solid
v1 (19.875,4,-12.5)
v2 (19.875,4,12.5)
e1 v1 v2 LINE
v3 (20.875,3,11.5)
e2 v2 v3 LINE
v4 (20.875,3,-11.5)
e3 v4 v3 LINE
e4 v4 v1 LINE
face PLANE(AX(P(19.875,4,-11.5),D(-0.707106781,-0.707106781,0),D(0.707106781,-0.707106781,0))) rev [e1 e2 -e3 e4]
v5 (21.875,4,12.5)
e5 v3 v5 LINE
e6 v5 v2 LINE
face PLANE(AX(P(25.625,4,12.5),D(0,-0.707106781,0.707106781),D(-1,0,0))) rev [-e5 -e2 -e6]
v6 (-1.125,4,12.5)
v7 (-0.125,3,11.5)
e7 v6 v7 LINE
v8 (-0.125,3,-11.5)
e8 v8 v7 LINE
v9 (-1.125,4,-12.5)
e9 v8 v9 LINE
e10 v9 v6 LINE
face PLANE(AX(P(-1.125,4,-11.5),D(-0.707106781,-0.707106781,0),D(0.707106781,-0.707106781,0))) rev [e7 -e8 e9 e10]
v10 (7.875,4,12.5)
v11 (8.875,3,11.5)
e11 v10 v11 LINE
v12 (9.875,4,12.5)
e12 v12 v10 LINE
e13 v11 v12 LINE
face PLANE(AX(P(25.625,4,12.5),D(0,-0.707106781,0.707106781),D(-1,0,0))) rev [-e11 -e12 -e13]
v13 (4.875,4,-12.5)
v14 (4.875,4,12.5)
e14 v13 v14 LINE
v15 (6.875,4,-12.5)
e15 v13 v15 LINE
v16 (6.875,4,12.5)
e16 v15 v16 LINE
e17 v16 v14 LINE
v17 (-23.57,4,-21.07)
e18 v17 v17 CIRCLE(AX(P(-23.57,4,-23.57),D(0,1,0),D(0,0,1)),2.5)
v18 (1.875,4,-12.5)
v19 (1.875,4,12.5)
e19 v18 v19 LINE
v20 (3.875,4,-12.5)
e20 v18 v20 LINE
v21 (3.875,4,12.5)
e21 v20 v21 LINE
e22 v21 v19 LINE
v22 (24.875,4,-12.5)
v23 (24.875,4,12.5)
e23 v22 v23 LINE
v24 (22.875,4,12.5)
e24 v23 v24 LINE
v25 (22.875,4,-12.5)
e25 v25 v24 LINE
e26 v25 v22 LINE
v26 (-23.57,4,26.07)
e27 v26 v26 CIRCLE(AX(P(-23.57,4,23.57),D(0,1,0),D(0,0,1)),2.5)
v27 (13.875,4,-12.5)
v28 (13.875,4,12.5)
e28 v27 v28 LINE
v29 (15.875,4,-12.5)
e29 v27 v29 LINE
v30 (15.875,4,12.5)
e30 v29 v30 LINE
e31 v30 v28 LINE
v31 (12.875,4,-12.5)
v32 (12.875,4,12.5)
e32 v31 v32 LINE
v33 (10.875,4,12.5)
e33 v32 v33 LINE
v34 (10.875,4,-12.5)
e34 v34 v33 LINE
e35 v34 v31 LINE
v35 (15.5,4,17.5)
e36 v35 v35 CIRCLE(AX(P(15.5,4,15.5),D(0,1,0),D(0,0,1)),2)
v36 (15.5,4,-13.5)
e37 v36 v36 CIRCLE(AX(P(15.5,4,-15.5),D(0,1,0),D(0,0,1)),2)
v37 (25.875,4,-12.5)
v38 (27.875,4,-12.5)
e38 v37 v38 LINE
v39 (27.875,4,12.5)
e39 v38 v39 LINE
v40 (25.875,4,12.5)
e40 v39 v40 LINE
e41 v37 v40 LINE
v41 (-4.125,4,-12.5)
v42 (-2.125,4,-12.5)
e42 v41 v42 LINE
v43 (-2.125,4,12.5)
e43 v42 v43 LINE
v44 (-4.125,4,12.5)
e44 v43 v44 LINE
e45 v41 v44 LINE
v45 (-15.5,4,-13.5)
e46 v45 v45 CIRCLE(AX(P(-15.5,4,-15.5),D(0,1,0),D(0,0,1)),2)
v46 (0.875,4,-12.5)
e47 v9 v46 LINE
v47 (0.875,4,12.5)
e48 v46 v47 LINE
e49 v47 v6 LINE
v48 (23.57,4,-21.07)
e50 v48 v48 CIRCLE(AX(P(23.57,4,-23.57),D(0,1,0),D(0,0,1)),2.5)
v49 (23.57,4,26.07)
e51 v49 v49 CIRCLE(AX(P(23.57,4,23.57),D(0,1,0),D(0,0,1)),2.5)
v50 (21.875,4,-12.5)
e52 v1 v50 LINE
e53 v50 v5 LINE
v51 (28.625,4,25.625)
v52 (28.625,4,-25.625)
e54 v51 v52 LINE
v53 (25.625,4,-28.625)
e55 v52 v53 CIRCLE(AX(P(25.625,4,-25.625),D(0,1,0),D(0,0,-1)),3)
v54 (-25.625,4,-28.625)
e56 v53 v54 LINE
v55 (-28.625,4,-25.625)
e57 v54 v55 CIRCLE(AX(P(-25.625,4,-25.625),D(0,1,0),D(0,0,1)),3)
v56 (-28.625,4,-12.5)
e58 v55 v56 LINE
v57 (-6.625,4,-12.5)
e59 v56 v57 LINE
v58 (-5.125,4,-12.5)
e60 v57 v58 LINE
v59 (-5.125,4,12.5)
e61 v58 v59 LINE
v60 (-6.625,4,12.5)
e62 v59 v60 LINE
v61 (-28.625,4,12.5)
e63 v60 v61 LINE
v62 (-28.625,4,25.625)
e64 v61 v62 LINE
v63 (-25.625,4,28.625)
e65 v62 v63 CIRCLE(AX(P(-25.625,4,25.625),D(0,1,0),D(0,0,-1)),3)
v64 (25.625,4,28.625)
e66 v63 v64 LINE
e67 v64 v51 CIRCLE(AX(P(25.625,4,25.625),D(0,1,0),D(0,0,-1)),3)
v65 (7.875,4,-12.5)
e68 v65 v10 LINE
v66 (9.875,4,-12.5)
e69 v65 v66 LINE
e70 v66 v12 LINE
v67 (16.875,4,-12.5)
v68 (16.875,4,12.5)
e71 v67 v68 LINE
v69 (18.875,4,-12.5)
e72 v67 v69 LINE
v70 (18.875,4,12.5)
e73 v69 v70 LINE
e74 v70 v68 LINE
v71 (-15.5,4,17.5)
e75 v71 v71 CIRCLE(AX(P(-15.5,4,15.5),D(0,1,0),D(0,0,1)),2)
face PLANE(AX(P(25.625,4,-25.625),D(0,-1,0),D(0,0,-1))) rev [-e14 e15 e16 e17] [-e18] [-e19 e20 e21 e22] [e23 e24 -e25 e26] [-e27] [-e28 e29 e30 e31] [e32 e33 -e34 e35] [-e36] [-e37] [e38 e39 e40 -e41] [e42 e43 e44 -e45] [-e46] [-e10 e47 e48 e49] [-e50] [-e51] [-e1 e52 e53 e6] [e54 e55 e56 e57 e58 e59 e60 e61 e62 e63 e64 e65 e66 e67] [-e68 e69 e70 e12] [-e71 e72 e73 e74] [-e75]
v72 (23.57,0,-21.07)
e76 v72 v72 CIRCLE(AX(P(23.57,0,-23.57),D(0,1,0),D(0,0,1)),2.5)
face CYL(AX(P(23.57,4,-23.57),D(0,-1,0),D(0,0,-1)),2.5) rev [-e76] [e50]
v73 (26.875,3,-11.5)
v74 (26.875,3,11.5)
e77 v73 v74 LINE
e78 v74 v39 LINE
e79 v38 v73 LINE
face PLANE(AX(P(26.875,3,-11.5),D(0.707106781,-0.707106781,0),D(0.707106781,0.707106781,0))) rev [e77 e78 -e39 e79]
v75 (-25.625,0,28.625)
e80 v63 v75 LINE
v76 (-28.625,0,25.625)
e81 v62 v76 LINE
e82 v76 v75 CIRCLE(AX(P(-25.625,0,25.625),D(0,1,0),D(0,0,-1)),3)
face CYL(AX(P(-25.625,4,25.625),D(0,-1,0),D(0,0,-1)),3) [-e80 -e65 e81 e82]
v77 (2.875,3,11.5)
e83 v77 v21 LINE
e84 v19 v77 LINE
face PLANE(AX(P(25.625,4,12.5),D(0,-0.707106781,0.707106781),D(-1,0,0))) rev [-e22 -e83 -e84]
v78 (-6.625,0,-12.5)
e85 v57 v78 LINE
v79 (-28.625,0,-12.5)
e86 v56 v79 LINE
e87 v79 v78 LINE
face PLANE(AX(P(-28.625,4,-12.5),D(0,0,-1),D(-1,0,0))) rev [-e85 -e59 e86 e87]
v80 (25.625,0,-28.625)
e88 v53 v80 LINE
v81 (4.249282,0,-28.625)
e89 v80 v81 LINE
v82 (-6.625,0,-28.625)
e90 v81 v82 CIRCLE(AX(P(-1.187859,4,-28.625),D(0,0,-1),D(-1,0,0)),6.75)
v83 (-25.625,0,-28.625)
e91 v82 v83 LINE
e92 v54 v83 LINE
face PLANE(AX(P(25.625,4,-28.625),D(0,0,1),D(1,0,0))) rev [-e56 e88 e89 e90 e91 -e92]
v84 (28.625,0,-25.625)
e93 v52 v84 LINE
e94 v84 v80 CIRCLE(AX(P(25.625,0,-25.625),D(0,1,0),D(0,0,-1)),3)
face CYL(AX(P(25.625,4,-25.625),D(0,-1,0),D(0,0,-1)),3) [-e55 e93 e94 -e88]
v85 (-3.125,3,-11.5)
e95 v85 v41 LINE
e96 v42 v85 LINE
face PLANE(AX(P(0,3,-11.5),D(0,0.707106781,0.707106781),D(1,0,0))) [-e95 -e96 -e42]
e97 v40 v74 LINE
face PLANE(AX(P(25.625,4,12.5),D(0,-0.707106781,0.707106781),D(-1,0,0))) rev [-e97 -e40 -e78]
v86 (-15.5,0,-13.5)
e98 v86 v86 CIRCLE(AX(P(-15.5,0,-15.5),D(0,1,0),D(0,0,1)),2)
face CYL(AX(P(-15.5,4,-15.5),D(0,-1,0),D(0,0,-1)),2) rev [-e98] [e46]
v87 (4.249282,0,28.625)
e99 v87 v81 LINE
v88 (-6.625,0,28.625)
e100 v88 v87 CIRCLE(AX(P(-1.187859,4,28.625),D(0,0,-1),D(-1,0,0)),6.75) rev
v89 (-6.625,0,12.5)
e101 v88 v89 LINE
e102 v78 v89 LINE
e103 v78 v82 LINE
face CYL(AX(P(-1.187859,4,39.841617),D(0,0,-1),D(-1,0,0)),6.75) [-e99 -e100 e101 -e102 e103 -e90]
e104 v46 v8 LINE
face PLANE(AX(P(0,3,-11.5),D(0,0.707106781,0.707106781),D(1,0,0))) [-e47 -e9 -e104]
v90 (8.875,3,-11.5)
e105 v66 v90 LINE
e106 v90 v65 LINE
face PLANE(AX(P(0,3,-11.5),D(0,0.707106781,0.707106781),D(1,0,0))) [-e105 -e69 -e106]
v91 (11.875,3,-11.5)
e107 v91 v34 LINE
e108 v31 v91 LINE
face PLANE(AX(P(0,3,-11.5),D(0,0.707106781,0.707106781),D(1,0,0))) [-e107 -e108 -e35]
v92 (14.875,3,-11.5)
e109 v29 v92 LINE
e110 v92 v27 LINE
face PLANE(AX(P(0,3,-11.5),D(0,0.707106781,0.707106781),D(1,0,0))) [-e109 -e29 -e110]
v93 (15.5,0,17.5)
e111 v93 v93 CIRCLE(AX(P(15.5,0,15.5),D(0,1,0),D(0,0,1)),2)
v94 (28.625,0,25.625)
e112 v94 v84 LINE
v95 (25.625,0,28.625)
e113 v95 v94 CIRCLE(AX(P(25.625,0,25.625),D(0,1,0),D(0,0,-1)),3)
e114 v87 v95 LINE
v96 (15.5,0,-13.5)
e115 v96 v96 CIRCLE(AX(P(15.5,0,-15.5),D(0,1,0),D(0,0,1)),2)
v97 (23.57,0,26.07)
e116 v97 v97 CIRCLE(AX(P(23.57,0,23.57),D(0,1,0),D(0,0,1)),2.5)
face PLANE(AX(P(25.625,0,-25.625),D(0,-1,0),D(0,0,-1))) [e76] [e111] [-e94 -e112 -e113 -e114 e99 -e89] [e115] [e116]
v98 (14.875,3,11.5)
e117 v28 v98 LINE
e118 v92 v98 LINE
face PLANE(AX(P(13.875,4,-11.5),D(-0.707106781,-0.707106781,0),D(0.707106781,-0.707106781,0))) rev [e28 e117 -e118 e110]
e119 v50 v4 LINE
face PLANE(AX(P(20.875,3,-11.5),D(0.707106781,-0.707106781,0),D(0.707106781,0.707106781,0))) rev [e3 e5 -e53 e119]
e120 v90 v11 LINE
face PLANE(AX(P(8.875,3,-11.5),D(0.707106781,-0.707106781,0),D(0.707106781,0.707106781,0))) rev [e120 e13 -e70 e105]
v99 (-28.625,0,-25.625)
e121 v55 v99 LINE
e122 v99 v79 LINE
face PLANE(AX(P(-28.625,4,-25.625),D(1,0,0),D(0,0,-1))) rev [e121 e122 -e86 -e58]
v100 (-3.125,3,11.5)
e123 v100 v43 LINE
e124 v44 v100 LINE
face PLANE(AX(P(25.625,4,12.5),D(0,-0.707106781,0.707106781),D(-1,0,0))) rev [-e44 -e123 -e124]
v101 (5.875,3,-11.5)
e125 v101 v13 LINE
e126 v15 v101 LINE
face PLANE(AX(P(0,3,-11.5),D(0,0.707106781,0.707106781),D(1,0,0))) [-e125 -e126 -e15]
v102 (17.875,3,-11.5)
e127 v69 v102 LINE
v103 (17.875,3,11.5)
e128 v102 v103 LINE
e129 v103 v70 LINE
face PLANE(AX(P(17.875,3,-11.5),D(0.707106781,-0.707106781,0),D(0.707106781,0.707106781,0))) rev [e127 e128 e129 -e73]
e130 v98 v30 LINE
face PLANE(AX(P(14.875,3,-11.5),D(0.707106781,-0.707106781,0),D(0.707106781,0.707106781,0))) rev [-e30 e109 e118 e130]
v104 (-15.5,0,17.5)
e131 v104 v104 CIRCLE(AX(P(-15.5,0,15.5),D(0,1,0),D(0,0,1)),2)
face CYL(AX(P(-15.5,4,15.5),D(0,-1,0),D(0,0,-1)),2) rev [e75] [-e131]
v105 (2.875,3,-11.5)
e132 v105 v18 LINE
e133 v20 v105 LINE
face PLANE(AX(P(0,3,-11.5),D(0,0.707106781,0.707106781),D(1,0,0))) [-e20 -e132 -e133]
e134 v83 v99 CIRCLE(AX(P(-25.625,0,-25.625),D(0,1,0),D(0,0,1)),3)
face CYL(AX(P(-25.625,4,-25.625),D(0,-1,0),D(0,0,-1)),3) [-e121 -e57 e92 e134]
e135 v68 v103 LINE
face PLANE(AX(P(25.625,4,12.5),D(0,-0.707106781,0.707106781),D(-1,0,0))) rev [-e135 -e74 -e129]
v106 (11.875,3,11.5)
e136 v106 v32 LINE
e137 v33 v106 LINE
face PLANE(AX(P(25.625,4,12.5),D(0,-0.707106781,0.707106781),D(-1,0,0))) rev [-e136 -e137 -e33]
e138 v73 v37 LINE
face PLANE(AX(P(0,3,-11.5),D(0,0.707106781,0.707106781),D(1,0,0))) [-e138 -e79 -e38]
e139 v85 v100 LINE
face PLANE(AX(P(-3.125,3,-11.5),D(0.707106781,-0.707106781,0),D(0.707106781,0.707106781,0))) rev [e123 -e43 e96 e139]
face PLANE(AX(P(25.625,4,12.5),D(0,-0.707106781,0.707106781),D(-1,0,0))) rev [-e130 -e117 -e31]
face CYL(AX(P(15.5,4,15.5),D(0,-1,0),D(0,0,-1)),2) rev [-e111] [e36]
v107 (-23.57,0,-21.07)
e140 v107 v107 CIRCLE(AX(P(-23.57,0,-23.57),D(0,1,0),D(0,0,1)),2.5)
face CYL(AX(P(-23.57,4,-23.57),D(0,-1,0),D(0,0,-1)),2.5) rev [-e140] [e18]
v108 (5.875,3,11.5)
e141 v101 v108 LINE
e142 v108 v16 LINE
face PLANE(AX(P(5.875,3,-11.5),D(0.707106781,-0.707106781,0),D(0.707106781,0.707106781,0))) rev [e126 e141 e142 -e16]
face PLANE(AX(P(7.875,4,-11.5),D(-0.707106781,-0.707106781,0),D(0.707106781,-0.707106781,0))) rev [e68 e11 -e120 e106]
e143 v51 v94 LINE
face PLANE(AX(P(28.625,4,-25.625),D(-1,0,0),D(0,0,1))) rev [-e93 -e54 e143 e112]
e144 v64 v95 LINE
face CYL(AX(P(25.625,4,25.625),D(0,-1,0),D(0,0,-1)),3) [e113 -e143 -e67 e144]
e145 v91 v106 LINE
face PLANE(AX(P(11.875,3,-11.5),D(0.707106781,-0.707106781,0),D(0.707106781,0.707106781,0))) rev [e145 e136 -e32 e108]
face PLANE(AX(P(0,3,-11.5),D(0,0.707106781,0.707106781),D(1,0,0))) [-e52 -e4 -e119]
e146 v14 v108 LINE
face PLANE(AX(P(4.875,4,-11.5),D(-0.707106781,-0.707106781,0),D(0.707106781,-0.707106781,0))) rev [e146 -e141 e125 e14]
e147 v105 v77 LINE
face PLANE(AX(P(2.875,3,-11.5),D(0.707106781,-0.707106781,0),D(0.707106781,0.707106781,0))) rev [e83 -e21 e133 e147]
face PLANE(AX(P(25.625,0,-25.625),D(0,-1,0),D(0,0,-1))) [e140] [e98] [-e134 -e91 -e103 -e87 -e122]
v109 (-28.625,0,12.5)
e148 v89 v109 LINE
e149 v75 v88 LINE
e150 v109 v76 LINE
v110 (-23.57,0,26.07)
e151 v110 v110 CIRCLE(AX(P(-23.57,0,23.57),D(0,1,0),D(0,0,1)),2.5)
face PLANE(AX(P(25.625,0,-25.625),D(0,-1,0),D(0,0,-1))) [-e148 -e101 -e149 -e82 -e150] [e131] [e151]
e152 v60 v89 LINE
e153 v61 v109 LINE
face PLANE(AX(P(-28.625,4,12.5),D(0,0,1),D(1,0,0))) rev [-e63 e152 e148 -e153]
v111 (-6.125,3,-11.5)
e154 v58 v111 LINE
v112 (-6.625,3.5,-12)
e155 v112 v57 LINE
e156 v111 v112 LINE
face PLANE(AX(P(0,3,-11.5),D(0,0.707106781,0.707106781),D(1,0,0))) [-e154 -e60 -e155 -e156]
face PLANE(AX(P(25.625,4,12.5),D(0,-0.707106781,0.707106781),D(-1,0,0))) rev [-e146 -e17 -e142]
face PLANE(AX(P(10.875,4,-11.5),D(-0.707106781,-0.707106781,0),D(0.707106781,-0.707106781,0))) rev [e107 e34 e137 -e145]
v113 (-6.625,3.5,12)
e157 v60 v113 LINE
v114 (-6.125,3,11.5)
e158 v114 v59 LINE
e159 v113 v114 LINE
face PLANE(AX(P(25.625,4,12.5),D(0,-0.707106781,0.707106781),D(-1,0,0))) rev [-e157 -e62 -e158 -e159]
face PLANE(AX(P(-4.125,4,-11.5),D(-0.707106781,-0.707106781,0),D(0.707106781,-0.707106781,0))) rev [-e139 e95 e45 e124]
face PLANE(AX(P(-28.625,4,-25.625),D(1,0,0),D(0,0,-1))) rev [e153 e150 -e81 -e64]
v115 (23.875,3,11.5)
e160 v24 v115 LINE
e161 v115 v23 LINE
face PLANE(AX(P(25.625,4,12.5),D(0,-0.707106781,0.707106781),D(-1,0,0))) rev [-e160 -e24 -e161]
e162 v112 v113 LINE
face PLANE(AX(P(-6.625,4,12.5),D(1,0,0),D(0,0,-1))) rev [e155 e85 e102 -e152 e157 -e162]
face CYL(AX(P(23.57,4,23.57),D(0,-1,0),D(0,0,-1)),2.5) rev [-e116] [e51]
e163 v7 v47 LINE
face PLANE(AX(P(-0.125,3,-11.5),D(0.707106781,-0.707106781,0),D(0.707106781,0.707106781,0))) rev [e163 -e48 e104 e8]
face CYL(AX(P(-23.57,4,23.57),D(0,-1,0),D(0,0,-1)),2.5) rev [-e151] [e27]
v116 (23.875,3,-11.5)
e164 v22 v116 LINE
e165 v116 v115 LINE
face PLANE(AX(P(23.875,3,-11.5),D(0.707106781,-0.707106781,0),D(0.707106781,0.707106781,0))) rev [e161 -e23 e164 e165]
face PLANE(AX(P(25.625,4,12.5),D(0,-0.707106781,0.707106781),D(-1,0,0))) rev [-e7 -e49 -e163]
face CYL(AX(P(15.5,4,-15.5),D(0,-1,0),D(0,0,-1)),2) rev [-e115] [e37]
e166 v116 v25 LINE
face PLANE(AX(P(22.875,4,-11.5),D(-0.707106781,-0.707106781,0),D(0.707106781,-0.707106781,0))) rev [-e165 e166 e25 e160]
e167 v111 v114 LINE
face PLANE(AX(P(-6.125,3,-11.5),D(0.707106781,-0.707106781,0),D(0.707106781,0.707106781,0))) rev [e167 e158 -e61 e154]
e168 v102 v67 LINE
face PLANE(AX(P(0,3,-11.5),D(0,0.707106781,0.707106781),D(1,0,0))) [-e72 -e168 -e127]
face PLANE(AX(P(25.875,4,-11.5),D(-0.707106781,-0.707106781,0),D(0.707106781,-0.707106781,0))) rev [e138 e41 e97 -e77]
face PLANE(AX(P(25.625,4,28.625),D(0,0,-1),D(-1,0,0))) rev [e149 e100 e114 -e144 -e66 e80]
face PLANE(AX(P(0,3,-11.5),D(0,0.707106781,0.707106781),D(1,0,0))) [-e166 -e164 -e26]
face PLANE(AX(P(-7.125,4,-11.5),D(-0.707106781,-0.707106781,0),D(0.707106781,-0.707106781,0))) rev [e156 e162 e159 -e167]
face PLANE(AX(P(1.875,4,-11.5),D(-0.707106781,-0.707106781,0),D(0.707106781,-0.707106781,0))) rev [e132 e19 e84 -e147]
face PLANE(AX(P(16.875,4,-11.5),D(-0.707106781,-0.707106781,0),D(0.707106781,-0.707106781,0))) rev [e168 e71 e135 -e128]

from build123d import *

# Parameters (mm, degrees)
SKETCH1_R              = 2
SKETCH1_R_2            = 2.5
BOSS_EXTRUDE1_DEPTH    = 4
CUT_EXTRUDE2_DEPTH     = 23
CHAMFER2_SIZE          = 1
CUT_EXTRUDE3_START     = -4
CUT_EXTRUDE3_OUTLINE_W = 22
CUT_EXTRUDE3_OUTLINE_H = 25
CUT_EXTRUDE3_DEPTH     = 4
BOSS_EXTRUDE2_REACH    = 66.132


# Read off the part's stored shape, not the designer's step: Cut-Extrude3
with BuildPart() as part:
    # Sketch1 → Boss-Extrude1 (new body)
    with BuildSketch(Plane(origin=(0, 0, 0), x_dir=(1, 0, 0), z_dir=(0, 1, 0))):
        with BuildLine():
            Line((25.625, 28.625), (-25.625, 28.625))
            ThreePointArc((-25.625, 28.625), (-27.746320344, 27.746320344), (-28.625, 25.625))
            Line((-28.625, 25.625), (-28.625, -25.625))
            ThreePointArc((-28.625, -25.625), (-27.746320344, -27.746320344), (-25.625, -28.625))
            Line((-25.625, -28.625), (25.625, -28.625))
            ThreePointArc((25.625, -28.625), (27.746320344, -27.746320344), (28.625, -25.625))
            Line((28.625, -25.625), (28.625, 25.625))
            ThreePointArc((28.625, 25.625), (27.746320344, 27.746320344), (25.625, 28.625))
        make_face()
        with Locations(Location((-15.5, 15.5, 0), (0, 0, 270))):
            Circle(SKETCH1_R, mode=Mode.SUBTRACT)
        with Locations(Location((-23.57, 23.57, 0), (0, 0, 270))):
            Circle(SKETCH1_R_2, mode=Mode.SUBTRACT)
        with Locations(Location((23.57, 23.57, 0), (0, 0, 270))):
            Circle(SKETCH1_R_2, mode=Mode.SUBTRACT)
        with Locations(Location((15.5, 15.5, 0), (0, 0, 270))):
            Circle(SKETCH1_R, mode=Mode.SUBTRACT)
        with Locations(Location((15.5, -15.5, 0), (0, 0, 270))):
            Circle(SKETCH1_R, mode=Mode.SUBTRACT)
        with Locations(Location((-15.5, -15.5, 0), (0, 0, 270))):
            Circle(SKETCH1_R, mode=Mode.SUBTRACT)
        with Locations(Location((-23.57, -23.57, 0), (0, 0, 270))):
            Circle(SKETCH1_R_2, mode=Mode.SUBTRACT)
        with Locations(Location((23.57, -23.57, 0), (0, 0, 270))):
            Circle(SKETCH1_R_2, mode=Mode.SUBTRACT)
    extrude(amount=BOSS_EXTRUDE1_DEPTH)

    # Sketch3 → Cut-Extrude2 (cut)
    with BuildSketch(Plane.XY.offset(11.5)):
        Polygon((-28.125, 4), (-27.125, 3), (-26.125, 4), align=None)
        Polygon((-25.125, 4), (-24.125, 3), (-23.125, 4), align=None)
        Polygon((-22.125, 4), (-21.125, 3), (-20.125, 4), align=None)
        Polygon((-19.125, 4), (-18.125, 3), (-17.125, 4), align=None)
        Polygon((-16.125, 4), (-15.125, 3), (-14.125, 4), align=None)
        Polygon((-13.125, 4), (-12.125, 3), (-11.125, 4), align=None)
        Polygon((-10.125, 4), (-9.125, 3), (-8.125, 4), align=None)
        Polygon((-7.125, 4), (-6.125, 3), (-5.125, 4), align=None)
        Polygon((-4.125, 4), (-3.125, 3), (-2.125, 4), align=None)
        Polygon((-1.125, 4), (-0.125, 3), (0.875, 4), align=None)
        Polygon((1.875, 4), (2.875, 3), (3.875, 4), align=None)
        Polygon((4.875, 4), (5.875, 3), (6.875, 4), align=None)
        Polygon((7.875, 4), (8.875, 3), (9.875, 4), align=None)
        Polygon((10.875, 4), (11.875, 3), (12.875, 4), align=None)
        Polygon((13.875, 4), (14.875, 3), (15.875, 4), align=None)
        Polygon((16.875, 4), (17.875, 3), (18.875, 4), align=None)
        Polygon((19.875, 4), (20.875, 3), (21.875, 4), align=None)
        Polygon((22.875, 4), (23.875, 3), (24.875, 4), align=None)
        Polygon((25.875, 4), (26.875, 3), (27.875, 4), align=None)
    extrude(amount=-CUT_EXTRUDE2_DEPTH, mode=Mode.SUBTRACT)

    # Chamfer2
    chamfer2_edges = [part.edges().sort_by_distance(p)[0] for p in [
        (26.875, 4, -11.5),
        (23.875, 4, -11.5),
        (20.875, 4, -11.5),
        (17.875, 4, -11.5),
        (14.875, 4, -11.5),
        (11.875, 4, -11.5),
        (8.875, 4, -11.5),
        (5.875, 4, -11.5),
        (2.875, 4, -11.5),
        (-0.125, 4, -11.5),
        (-3.125, 4, -11.5),
        (-6.125, 4, -11.5),
        (-9.125, 4, -11.5),
        (-12.125, 4, -11.5),
        (-15.125, 4, -11.5),
        (-18.125, 4, -11.5),
        (-21.125, 4, -11.5),
        (-24.125, 4, -11.5),
        (-27.125, 4, -11.5),
        (26.875, 4, 11.5),
        (23.875, 4, 11.5),
        (20.875, 4, 11.5),
        (17.875, 4, 11.5),
        (14.875, 4, 11.5),
        (11.875, 4, 11.5),
        (8.875, 4, 11.5),
        (5.875, 4, 11.5),
        (2.875, 4, 11.5),
        (-0.125, 4, 11.5),
        (-3.125, 4, 11.5),
        (-6.125, 4, 11.5),
        (-9.125, 4, 11.5),
        (-12.125, 4, 11.5),
        (-15.125, 4, 11.5),
        (-18.125, 4, 11.5),
        (-21.125, 4, 11.5),
        (-24.125, 4, 11.5),
        (-27.125, 4, 11.5),
    ]]
    chamfer(chamfer2_edges, length=CHAMFER2_SIZE - 0.0001)  # a hair under: the kernel refuses the full size

    # Cut-Extrude3 outline → Cut-Extrude3 (cut)
    with BuildSketch(Plane.XZ.offset(CUT_EXTRUDE3_START)):
        with Locations((-17.625, 0)):
            Rectangle(CUT_EXTRUDE3_OUTLINE_W, CUT_EXTRUDE3_OUTLINE_H)
    extrude(amount=CUT_EXTRUDE3_DEPTH, mode=Mode.SUBTRACT)

    # Boss-Extrude2: up to this face of the body (flat: up to its plane)
    boss_extrude2_end = Plane(part.part.faces().sort_by_distance((0, 2, 28.625))[0])
    # Sketch5 → Boss-Extrude2 (add, up to the picked face)
    with BuildSketch(Plane(origin=(0, 0, -28.625), x_dir=(-1, 0, 0), z_dir=(0, 0, -1)), mode=Mode.PRIVATE) as boss_extrude2_sk1:
        with BuildLine():
            Line((6.625, 0), (-4.249281585, 0))
            ThreePointArc((-4.249281585, 0), (1.187859207, -2.75), (6.625, 0))
        make_face()
    boss_extrude2_tool1 = split(extrude(boss_extrude2_sk1.sketch, amount=-BOSS_EXTRUDE2_REACH, mode=Mode.PRIVATE), bisect_by=boss_extrude2_end, keep=Keep.BOTH, mode=Mode.PRIVATE)
    add(boss_extrude2_tool1.solids().sort_by(Axis((-1.187859, -1.121798, -28.625), (0, 0, 1)))[0])


solid = part.part
